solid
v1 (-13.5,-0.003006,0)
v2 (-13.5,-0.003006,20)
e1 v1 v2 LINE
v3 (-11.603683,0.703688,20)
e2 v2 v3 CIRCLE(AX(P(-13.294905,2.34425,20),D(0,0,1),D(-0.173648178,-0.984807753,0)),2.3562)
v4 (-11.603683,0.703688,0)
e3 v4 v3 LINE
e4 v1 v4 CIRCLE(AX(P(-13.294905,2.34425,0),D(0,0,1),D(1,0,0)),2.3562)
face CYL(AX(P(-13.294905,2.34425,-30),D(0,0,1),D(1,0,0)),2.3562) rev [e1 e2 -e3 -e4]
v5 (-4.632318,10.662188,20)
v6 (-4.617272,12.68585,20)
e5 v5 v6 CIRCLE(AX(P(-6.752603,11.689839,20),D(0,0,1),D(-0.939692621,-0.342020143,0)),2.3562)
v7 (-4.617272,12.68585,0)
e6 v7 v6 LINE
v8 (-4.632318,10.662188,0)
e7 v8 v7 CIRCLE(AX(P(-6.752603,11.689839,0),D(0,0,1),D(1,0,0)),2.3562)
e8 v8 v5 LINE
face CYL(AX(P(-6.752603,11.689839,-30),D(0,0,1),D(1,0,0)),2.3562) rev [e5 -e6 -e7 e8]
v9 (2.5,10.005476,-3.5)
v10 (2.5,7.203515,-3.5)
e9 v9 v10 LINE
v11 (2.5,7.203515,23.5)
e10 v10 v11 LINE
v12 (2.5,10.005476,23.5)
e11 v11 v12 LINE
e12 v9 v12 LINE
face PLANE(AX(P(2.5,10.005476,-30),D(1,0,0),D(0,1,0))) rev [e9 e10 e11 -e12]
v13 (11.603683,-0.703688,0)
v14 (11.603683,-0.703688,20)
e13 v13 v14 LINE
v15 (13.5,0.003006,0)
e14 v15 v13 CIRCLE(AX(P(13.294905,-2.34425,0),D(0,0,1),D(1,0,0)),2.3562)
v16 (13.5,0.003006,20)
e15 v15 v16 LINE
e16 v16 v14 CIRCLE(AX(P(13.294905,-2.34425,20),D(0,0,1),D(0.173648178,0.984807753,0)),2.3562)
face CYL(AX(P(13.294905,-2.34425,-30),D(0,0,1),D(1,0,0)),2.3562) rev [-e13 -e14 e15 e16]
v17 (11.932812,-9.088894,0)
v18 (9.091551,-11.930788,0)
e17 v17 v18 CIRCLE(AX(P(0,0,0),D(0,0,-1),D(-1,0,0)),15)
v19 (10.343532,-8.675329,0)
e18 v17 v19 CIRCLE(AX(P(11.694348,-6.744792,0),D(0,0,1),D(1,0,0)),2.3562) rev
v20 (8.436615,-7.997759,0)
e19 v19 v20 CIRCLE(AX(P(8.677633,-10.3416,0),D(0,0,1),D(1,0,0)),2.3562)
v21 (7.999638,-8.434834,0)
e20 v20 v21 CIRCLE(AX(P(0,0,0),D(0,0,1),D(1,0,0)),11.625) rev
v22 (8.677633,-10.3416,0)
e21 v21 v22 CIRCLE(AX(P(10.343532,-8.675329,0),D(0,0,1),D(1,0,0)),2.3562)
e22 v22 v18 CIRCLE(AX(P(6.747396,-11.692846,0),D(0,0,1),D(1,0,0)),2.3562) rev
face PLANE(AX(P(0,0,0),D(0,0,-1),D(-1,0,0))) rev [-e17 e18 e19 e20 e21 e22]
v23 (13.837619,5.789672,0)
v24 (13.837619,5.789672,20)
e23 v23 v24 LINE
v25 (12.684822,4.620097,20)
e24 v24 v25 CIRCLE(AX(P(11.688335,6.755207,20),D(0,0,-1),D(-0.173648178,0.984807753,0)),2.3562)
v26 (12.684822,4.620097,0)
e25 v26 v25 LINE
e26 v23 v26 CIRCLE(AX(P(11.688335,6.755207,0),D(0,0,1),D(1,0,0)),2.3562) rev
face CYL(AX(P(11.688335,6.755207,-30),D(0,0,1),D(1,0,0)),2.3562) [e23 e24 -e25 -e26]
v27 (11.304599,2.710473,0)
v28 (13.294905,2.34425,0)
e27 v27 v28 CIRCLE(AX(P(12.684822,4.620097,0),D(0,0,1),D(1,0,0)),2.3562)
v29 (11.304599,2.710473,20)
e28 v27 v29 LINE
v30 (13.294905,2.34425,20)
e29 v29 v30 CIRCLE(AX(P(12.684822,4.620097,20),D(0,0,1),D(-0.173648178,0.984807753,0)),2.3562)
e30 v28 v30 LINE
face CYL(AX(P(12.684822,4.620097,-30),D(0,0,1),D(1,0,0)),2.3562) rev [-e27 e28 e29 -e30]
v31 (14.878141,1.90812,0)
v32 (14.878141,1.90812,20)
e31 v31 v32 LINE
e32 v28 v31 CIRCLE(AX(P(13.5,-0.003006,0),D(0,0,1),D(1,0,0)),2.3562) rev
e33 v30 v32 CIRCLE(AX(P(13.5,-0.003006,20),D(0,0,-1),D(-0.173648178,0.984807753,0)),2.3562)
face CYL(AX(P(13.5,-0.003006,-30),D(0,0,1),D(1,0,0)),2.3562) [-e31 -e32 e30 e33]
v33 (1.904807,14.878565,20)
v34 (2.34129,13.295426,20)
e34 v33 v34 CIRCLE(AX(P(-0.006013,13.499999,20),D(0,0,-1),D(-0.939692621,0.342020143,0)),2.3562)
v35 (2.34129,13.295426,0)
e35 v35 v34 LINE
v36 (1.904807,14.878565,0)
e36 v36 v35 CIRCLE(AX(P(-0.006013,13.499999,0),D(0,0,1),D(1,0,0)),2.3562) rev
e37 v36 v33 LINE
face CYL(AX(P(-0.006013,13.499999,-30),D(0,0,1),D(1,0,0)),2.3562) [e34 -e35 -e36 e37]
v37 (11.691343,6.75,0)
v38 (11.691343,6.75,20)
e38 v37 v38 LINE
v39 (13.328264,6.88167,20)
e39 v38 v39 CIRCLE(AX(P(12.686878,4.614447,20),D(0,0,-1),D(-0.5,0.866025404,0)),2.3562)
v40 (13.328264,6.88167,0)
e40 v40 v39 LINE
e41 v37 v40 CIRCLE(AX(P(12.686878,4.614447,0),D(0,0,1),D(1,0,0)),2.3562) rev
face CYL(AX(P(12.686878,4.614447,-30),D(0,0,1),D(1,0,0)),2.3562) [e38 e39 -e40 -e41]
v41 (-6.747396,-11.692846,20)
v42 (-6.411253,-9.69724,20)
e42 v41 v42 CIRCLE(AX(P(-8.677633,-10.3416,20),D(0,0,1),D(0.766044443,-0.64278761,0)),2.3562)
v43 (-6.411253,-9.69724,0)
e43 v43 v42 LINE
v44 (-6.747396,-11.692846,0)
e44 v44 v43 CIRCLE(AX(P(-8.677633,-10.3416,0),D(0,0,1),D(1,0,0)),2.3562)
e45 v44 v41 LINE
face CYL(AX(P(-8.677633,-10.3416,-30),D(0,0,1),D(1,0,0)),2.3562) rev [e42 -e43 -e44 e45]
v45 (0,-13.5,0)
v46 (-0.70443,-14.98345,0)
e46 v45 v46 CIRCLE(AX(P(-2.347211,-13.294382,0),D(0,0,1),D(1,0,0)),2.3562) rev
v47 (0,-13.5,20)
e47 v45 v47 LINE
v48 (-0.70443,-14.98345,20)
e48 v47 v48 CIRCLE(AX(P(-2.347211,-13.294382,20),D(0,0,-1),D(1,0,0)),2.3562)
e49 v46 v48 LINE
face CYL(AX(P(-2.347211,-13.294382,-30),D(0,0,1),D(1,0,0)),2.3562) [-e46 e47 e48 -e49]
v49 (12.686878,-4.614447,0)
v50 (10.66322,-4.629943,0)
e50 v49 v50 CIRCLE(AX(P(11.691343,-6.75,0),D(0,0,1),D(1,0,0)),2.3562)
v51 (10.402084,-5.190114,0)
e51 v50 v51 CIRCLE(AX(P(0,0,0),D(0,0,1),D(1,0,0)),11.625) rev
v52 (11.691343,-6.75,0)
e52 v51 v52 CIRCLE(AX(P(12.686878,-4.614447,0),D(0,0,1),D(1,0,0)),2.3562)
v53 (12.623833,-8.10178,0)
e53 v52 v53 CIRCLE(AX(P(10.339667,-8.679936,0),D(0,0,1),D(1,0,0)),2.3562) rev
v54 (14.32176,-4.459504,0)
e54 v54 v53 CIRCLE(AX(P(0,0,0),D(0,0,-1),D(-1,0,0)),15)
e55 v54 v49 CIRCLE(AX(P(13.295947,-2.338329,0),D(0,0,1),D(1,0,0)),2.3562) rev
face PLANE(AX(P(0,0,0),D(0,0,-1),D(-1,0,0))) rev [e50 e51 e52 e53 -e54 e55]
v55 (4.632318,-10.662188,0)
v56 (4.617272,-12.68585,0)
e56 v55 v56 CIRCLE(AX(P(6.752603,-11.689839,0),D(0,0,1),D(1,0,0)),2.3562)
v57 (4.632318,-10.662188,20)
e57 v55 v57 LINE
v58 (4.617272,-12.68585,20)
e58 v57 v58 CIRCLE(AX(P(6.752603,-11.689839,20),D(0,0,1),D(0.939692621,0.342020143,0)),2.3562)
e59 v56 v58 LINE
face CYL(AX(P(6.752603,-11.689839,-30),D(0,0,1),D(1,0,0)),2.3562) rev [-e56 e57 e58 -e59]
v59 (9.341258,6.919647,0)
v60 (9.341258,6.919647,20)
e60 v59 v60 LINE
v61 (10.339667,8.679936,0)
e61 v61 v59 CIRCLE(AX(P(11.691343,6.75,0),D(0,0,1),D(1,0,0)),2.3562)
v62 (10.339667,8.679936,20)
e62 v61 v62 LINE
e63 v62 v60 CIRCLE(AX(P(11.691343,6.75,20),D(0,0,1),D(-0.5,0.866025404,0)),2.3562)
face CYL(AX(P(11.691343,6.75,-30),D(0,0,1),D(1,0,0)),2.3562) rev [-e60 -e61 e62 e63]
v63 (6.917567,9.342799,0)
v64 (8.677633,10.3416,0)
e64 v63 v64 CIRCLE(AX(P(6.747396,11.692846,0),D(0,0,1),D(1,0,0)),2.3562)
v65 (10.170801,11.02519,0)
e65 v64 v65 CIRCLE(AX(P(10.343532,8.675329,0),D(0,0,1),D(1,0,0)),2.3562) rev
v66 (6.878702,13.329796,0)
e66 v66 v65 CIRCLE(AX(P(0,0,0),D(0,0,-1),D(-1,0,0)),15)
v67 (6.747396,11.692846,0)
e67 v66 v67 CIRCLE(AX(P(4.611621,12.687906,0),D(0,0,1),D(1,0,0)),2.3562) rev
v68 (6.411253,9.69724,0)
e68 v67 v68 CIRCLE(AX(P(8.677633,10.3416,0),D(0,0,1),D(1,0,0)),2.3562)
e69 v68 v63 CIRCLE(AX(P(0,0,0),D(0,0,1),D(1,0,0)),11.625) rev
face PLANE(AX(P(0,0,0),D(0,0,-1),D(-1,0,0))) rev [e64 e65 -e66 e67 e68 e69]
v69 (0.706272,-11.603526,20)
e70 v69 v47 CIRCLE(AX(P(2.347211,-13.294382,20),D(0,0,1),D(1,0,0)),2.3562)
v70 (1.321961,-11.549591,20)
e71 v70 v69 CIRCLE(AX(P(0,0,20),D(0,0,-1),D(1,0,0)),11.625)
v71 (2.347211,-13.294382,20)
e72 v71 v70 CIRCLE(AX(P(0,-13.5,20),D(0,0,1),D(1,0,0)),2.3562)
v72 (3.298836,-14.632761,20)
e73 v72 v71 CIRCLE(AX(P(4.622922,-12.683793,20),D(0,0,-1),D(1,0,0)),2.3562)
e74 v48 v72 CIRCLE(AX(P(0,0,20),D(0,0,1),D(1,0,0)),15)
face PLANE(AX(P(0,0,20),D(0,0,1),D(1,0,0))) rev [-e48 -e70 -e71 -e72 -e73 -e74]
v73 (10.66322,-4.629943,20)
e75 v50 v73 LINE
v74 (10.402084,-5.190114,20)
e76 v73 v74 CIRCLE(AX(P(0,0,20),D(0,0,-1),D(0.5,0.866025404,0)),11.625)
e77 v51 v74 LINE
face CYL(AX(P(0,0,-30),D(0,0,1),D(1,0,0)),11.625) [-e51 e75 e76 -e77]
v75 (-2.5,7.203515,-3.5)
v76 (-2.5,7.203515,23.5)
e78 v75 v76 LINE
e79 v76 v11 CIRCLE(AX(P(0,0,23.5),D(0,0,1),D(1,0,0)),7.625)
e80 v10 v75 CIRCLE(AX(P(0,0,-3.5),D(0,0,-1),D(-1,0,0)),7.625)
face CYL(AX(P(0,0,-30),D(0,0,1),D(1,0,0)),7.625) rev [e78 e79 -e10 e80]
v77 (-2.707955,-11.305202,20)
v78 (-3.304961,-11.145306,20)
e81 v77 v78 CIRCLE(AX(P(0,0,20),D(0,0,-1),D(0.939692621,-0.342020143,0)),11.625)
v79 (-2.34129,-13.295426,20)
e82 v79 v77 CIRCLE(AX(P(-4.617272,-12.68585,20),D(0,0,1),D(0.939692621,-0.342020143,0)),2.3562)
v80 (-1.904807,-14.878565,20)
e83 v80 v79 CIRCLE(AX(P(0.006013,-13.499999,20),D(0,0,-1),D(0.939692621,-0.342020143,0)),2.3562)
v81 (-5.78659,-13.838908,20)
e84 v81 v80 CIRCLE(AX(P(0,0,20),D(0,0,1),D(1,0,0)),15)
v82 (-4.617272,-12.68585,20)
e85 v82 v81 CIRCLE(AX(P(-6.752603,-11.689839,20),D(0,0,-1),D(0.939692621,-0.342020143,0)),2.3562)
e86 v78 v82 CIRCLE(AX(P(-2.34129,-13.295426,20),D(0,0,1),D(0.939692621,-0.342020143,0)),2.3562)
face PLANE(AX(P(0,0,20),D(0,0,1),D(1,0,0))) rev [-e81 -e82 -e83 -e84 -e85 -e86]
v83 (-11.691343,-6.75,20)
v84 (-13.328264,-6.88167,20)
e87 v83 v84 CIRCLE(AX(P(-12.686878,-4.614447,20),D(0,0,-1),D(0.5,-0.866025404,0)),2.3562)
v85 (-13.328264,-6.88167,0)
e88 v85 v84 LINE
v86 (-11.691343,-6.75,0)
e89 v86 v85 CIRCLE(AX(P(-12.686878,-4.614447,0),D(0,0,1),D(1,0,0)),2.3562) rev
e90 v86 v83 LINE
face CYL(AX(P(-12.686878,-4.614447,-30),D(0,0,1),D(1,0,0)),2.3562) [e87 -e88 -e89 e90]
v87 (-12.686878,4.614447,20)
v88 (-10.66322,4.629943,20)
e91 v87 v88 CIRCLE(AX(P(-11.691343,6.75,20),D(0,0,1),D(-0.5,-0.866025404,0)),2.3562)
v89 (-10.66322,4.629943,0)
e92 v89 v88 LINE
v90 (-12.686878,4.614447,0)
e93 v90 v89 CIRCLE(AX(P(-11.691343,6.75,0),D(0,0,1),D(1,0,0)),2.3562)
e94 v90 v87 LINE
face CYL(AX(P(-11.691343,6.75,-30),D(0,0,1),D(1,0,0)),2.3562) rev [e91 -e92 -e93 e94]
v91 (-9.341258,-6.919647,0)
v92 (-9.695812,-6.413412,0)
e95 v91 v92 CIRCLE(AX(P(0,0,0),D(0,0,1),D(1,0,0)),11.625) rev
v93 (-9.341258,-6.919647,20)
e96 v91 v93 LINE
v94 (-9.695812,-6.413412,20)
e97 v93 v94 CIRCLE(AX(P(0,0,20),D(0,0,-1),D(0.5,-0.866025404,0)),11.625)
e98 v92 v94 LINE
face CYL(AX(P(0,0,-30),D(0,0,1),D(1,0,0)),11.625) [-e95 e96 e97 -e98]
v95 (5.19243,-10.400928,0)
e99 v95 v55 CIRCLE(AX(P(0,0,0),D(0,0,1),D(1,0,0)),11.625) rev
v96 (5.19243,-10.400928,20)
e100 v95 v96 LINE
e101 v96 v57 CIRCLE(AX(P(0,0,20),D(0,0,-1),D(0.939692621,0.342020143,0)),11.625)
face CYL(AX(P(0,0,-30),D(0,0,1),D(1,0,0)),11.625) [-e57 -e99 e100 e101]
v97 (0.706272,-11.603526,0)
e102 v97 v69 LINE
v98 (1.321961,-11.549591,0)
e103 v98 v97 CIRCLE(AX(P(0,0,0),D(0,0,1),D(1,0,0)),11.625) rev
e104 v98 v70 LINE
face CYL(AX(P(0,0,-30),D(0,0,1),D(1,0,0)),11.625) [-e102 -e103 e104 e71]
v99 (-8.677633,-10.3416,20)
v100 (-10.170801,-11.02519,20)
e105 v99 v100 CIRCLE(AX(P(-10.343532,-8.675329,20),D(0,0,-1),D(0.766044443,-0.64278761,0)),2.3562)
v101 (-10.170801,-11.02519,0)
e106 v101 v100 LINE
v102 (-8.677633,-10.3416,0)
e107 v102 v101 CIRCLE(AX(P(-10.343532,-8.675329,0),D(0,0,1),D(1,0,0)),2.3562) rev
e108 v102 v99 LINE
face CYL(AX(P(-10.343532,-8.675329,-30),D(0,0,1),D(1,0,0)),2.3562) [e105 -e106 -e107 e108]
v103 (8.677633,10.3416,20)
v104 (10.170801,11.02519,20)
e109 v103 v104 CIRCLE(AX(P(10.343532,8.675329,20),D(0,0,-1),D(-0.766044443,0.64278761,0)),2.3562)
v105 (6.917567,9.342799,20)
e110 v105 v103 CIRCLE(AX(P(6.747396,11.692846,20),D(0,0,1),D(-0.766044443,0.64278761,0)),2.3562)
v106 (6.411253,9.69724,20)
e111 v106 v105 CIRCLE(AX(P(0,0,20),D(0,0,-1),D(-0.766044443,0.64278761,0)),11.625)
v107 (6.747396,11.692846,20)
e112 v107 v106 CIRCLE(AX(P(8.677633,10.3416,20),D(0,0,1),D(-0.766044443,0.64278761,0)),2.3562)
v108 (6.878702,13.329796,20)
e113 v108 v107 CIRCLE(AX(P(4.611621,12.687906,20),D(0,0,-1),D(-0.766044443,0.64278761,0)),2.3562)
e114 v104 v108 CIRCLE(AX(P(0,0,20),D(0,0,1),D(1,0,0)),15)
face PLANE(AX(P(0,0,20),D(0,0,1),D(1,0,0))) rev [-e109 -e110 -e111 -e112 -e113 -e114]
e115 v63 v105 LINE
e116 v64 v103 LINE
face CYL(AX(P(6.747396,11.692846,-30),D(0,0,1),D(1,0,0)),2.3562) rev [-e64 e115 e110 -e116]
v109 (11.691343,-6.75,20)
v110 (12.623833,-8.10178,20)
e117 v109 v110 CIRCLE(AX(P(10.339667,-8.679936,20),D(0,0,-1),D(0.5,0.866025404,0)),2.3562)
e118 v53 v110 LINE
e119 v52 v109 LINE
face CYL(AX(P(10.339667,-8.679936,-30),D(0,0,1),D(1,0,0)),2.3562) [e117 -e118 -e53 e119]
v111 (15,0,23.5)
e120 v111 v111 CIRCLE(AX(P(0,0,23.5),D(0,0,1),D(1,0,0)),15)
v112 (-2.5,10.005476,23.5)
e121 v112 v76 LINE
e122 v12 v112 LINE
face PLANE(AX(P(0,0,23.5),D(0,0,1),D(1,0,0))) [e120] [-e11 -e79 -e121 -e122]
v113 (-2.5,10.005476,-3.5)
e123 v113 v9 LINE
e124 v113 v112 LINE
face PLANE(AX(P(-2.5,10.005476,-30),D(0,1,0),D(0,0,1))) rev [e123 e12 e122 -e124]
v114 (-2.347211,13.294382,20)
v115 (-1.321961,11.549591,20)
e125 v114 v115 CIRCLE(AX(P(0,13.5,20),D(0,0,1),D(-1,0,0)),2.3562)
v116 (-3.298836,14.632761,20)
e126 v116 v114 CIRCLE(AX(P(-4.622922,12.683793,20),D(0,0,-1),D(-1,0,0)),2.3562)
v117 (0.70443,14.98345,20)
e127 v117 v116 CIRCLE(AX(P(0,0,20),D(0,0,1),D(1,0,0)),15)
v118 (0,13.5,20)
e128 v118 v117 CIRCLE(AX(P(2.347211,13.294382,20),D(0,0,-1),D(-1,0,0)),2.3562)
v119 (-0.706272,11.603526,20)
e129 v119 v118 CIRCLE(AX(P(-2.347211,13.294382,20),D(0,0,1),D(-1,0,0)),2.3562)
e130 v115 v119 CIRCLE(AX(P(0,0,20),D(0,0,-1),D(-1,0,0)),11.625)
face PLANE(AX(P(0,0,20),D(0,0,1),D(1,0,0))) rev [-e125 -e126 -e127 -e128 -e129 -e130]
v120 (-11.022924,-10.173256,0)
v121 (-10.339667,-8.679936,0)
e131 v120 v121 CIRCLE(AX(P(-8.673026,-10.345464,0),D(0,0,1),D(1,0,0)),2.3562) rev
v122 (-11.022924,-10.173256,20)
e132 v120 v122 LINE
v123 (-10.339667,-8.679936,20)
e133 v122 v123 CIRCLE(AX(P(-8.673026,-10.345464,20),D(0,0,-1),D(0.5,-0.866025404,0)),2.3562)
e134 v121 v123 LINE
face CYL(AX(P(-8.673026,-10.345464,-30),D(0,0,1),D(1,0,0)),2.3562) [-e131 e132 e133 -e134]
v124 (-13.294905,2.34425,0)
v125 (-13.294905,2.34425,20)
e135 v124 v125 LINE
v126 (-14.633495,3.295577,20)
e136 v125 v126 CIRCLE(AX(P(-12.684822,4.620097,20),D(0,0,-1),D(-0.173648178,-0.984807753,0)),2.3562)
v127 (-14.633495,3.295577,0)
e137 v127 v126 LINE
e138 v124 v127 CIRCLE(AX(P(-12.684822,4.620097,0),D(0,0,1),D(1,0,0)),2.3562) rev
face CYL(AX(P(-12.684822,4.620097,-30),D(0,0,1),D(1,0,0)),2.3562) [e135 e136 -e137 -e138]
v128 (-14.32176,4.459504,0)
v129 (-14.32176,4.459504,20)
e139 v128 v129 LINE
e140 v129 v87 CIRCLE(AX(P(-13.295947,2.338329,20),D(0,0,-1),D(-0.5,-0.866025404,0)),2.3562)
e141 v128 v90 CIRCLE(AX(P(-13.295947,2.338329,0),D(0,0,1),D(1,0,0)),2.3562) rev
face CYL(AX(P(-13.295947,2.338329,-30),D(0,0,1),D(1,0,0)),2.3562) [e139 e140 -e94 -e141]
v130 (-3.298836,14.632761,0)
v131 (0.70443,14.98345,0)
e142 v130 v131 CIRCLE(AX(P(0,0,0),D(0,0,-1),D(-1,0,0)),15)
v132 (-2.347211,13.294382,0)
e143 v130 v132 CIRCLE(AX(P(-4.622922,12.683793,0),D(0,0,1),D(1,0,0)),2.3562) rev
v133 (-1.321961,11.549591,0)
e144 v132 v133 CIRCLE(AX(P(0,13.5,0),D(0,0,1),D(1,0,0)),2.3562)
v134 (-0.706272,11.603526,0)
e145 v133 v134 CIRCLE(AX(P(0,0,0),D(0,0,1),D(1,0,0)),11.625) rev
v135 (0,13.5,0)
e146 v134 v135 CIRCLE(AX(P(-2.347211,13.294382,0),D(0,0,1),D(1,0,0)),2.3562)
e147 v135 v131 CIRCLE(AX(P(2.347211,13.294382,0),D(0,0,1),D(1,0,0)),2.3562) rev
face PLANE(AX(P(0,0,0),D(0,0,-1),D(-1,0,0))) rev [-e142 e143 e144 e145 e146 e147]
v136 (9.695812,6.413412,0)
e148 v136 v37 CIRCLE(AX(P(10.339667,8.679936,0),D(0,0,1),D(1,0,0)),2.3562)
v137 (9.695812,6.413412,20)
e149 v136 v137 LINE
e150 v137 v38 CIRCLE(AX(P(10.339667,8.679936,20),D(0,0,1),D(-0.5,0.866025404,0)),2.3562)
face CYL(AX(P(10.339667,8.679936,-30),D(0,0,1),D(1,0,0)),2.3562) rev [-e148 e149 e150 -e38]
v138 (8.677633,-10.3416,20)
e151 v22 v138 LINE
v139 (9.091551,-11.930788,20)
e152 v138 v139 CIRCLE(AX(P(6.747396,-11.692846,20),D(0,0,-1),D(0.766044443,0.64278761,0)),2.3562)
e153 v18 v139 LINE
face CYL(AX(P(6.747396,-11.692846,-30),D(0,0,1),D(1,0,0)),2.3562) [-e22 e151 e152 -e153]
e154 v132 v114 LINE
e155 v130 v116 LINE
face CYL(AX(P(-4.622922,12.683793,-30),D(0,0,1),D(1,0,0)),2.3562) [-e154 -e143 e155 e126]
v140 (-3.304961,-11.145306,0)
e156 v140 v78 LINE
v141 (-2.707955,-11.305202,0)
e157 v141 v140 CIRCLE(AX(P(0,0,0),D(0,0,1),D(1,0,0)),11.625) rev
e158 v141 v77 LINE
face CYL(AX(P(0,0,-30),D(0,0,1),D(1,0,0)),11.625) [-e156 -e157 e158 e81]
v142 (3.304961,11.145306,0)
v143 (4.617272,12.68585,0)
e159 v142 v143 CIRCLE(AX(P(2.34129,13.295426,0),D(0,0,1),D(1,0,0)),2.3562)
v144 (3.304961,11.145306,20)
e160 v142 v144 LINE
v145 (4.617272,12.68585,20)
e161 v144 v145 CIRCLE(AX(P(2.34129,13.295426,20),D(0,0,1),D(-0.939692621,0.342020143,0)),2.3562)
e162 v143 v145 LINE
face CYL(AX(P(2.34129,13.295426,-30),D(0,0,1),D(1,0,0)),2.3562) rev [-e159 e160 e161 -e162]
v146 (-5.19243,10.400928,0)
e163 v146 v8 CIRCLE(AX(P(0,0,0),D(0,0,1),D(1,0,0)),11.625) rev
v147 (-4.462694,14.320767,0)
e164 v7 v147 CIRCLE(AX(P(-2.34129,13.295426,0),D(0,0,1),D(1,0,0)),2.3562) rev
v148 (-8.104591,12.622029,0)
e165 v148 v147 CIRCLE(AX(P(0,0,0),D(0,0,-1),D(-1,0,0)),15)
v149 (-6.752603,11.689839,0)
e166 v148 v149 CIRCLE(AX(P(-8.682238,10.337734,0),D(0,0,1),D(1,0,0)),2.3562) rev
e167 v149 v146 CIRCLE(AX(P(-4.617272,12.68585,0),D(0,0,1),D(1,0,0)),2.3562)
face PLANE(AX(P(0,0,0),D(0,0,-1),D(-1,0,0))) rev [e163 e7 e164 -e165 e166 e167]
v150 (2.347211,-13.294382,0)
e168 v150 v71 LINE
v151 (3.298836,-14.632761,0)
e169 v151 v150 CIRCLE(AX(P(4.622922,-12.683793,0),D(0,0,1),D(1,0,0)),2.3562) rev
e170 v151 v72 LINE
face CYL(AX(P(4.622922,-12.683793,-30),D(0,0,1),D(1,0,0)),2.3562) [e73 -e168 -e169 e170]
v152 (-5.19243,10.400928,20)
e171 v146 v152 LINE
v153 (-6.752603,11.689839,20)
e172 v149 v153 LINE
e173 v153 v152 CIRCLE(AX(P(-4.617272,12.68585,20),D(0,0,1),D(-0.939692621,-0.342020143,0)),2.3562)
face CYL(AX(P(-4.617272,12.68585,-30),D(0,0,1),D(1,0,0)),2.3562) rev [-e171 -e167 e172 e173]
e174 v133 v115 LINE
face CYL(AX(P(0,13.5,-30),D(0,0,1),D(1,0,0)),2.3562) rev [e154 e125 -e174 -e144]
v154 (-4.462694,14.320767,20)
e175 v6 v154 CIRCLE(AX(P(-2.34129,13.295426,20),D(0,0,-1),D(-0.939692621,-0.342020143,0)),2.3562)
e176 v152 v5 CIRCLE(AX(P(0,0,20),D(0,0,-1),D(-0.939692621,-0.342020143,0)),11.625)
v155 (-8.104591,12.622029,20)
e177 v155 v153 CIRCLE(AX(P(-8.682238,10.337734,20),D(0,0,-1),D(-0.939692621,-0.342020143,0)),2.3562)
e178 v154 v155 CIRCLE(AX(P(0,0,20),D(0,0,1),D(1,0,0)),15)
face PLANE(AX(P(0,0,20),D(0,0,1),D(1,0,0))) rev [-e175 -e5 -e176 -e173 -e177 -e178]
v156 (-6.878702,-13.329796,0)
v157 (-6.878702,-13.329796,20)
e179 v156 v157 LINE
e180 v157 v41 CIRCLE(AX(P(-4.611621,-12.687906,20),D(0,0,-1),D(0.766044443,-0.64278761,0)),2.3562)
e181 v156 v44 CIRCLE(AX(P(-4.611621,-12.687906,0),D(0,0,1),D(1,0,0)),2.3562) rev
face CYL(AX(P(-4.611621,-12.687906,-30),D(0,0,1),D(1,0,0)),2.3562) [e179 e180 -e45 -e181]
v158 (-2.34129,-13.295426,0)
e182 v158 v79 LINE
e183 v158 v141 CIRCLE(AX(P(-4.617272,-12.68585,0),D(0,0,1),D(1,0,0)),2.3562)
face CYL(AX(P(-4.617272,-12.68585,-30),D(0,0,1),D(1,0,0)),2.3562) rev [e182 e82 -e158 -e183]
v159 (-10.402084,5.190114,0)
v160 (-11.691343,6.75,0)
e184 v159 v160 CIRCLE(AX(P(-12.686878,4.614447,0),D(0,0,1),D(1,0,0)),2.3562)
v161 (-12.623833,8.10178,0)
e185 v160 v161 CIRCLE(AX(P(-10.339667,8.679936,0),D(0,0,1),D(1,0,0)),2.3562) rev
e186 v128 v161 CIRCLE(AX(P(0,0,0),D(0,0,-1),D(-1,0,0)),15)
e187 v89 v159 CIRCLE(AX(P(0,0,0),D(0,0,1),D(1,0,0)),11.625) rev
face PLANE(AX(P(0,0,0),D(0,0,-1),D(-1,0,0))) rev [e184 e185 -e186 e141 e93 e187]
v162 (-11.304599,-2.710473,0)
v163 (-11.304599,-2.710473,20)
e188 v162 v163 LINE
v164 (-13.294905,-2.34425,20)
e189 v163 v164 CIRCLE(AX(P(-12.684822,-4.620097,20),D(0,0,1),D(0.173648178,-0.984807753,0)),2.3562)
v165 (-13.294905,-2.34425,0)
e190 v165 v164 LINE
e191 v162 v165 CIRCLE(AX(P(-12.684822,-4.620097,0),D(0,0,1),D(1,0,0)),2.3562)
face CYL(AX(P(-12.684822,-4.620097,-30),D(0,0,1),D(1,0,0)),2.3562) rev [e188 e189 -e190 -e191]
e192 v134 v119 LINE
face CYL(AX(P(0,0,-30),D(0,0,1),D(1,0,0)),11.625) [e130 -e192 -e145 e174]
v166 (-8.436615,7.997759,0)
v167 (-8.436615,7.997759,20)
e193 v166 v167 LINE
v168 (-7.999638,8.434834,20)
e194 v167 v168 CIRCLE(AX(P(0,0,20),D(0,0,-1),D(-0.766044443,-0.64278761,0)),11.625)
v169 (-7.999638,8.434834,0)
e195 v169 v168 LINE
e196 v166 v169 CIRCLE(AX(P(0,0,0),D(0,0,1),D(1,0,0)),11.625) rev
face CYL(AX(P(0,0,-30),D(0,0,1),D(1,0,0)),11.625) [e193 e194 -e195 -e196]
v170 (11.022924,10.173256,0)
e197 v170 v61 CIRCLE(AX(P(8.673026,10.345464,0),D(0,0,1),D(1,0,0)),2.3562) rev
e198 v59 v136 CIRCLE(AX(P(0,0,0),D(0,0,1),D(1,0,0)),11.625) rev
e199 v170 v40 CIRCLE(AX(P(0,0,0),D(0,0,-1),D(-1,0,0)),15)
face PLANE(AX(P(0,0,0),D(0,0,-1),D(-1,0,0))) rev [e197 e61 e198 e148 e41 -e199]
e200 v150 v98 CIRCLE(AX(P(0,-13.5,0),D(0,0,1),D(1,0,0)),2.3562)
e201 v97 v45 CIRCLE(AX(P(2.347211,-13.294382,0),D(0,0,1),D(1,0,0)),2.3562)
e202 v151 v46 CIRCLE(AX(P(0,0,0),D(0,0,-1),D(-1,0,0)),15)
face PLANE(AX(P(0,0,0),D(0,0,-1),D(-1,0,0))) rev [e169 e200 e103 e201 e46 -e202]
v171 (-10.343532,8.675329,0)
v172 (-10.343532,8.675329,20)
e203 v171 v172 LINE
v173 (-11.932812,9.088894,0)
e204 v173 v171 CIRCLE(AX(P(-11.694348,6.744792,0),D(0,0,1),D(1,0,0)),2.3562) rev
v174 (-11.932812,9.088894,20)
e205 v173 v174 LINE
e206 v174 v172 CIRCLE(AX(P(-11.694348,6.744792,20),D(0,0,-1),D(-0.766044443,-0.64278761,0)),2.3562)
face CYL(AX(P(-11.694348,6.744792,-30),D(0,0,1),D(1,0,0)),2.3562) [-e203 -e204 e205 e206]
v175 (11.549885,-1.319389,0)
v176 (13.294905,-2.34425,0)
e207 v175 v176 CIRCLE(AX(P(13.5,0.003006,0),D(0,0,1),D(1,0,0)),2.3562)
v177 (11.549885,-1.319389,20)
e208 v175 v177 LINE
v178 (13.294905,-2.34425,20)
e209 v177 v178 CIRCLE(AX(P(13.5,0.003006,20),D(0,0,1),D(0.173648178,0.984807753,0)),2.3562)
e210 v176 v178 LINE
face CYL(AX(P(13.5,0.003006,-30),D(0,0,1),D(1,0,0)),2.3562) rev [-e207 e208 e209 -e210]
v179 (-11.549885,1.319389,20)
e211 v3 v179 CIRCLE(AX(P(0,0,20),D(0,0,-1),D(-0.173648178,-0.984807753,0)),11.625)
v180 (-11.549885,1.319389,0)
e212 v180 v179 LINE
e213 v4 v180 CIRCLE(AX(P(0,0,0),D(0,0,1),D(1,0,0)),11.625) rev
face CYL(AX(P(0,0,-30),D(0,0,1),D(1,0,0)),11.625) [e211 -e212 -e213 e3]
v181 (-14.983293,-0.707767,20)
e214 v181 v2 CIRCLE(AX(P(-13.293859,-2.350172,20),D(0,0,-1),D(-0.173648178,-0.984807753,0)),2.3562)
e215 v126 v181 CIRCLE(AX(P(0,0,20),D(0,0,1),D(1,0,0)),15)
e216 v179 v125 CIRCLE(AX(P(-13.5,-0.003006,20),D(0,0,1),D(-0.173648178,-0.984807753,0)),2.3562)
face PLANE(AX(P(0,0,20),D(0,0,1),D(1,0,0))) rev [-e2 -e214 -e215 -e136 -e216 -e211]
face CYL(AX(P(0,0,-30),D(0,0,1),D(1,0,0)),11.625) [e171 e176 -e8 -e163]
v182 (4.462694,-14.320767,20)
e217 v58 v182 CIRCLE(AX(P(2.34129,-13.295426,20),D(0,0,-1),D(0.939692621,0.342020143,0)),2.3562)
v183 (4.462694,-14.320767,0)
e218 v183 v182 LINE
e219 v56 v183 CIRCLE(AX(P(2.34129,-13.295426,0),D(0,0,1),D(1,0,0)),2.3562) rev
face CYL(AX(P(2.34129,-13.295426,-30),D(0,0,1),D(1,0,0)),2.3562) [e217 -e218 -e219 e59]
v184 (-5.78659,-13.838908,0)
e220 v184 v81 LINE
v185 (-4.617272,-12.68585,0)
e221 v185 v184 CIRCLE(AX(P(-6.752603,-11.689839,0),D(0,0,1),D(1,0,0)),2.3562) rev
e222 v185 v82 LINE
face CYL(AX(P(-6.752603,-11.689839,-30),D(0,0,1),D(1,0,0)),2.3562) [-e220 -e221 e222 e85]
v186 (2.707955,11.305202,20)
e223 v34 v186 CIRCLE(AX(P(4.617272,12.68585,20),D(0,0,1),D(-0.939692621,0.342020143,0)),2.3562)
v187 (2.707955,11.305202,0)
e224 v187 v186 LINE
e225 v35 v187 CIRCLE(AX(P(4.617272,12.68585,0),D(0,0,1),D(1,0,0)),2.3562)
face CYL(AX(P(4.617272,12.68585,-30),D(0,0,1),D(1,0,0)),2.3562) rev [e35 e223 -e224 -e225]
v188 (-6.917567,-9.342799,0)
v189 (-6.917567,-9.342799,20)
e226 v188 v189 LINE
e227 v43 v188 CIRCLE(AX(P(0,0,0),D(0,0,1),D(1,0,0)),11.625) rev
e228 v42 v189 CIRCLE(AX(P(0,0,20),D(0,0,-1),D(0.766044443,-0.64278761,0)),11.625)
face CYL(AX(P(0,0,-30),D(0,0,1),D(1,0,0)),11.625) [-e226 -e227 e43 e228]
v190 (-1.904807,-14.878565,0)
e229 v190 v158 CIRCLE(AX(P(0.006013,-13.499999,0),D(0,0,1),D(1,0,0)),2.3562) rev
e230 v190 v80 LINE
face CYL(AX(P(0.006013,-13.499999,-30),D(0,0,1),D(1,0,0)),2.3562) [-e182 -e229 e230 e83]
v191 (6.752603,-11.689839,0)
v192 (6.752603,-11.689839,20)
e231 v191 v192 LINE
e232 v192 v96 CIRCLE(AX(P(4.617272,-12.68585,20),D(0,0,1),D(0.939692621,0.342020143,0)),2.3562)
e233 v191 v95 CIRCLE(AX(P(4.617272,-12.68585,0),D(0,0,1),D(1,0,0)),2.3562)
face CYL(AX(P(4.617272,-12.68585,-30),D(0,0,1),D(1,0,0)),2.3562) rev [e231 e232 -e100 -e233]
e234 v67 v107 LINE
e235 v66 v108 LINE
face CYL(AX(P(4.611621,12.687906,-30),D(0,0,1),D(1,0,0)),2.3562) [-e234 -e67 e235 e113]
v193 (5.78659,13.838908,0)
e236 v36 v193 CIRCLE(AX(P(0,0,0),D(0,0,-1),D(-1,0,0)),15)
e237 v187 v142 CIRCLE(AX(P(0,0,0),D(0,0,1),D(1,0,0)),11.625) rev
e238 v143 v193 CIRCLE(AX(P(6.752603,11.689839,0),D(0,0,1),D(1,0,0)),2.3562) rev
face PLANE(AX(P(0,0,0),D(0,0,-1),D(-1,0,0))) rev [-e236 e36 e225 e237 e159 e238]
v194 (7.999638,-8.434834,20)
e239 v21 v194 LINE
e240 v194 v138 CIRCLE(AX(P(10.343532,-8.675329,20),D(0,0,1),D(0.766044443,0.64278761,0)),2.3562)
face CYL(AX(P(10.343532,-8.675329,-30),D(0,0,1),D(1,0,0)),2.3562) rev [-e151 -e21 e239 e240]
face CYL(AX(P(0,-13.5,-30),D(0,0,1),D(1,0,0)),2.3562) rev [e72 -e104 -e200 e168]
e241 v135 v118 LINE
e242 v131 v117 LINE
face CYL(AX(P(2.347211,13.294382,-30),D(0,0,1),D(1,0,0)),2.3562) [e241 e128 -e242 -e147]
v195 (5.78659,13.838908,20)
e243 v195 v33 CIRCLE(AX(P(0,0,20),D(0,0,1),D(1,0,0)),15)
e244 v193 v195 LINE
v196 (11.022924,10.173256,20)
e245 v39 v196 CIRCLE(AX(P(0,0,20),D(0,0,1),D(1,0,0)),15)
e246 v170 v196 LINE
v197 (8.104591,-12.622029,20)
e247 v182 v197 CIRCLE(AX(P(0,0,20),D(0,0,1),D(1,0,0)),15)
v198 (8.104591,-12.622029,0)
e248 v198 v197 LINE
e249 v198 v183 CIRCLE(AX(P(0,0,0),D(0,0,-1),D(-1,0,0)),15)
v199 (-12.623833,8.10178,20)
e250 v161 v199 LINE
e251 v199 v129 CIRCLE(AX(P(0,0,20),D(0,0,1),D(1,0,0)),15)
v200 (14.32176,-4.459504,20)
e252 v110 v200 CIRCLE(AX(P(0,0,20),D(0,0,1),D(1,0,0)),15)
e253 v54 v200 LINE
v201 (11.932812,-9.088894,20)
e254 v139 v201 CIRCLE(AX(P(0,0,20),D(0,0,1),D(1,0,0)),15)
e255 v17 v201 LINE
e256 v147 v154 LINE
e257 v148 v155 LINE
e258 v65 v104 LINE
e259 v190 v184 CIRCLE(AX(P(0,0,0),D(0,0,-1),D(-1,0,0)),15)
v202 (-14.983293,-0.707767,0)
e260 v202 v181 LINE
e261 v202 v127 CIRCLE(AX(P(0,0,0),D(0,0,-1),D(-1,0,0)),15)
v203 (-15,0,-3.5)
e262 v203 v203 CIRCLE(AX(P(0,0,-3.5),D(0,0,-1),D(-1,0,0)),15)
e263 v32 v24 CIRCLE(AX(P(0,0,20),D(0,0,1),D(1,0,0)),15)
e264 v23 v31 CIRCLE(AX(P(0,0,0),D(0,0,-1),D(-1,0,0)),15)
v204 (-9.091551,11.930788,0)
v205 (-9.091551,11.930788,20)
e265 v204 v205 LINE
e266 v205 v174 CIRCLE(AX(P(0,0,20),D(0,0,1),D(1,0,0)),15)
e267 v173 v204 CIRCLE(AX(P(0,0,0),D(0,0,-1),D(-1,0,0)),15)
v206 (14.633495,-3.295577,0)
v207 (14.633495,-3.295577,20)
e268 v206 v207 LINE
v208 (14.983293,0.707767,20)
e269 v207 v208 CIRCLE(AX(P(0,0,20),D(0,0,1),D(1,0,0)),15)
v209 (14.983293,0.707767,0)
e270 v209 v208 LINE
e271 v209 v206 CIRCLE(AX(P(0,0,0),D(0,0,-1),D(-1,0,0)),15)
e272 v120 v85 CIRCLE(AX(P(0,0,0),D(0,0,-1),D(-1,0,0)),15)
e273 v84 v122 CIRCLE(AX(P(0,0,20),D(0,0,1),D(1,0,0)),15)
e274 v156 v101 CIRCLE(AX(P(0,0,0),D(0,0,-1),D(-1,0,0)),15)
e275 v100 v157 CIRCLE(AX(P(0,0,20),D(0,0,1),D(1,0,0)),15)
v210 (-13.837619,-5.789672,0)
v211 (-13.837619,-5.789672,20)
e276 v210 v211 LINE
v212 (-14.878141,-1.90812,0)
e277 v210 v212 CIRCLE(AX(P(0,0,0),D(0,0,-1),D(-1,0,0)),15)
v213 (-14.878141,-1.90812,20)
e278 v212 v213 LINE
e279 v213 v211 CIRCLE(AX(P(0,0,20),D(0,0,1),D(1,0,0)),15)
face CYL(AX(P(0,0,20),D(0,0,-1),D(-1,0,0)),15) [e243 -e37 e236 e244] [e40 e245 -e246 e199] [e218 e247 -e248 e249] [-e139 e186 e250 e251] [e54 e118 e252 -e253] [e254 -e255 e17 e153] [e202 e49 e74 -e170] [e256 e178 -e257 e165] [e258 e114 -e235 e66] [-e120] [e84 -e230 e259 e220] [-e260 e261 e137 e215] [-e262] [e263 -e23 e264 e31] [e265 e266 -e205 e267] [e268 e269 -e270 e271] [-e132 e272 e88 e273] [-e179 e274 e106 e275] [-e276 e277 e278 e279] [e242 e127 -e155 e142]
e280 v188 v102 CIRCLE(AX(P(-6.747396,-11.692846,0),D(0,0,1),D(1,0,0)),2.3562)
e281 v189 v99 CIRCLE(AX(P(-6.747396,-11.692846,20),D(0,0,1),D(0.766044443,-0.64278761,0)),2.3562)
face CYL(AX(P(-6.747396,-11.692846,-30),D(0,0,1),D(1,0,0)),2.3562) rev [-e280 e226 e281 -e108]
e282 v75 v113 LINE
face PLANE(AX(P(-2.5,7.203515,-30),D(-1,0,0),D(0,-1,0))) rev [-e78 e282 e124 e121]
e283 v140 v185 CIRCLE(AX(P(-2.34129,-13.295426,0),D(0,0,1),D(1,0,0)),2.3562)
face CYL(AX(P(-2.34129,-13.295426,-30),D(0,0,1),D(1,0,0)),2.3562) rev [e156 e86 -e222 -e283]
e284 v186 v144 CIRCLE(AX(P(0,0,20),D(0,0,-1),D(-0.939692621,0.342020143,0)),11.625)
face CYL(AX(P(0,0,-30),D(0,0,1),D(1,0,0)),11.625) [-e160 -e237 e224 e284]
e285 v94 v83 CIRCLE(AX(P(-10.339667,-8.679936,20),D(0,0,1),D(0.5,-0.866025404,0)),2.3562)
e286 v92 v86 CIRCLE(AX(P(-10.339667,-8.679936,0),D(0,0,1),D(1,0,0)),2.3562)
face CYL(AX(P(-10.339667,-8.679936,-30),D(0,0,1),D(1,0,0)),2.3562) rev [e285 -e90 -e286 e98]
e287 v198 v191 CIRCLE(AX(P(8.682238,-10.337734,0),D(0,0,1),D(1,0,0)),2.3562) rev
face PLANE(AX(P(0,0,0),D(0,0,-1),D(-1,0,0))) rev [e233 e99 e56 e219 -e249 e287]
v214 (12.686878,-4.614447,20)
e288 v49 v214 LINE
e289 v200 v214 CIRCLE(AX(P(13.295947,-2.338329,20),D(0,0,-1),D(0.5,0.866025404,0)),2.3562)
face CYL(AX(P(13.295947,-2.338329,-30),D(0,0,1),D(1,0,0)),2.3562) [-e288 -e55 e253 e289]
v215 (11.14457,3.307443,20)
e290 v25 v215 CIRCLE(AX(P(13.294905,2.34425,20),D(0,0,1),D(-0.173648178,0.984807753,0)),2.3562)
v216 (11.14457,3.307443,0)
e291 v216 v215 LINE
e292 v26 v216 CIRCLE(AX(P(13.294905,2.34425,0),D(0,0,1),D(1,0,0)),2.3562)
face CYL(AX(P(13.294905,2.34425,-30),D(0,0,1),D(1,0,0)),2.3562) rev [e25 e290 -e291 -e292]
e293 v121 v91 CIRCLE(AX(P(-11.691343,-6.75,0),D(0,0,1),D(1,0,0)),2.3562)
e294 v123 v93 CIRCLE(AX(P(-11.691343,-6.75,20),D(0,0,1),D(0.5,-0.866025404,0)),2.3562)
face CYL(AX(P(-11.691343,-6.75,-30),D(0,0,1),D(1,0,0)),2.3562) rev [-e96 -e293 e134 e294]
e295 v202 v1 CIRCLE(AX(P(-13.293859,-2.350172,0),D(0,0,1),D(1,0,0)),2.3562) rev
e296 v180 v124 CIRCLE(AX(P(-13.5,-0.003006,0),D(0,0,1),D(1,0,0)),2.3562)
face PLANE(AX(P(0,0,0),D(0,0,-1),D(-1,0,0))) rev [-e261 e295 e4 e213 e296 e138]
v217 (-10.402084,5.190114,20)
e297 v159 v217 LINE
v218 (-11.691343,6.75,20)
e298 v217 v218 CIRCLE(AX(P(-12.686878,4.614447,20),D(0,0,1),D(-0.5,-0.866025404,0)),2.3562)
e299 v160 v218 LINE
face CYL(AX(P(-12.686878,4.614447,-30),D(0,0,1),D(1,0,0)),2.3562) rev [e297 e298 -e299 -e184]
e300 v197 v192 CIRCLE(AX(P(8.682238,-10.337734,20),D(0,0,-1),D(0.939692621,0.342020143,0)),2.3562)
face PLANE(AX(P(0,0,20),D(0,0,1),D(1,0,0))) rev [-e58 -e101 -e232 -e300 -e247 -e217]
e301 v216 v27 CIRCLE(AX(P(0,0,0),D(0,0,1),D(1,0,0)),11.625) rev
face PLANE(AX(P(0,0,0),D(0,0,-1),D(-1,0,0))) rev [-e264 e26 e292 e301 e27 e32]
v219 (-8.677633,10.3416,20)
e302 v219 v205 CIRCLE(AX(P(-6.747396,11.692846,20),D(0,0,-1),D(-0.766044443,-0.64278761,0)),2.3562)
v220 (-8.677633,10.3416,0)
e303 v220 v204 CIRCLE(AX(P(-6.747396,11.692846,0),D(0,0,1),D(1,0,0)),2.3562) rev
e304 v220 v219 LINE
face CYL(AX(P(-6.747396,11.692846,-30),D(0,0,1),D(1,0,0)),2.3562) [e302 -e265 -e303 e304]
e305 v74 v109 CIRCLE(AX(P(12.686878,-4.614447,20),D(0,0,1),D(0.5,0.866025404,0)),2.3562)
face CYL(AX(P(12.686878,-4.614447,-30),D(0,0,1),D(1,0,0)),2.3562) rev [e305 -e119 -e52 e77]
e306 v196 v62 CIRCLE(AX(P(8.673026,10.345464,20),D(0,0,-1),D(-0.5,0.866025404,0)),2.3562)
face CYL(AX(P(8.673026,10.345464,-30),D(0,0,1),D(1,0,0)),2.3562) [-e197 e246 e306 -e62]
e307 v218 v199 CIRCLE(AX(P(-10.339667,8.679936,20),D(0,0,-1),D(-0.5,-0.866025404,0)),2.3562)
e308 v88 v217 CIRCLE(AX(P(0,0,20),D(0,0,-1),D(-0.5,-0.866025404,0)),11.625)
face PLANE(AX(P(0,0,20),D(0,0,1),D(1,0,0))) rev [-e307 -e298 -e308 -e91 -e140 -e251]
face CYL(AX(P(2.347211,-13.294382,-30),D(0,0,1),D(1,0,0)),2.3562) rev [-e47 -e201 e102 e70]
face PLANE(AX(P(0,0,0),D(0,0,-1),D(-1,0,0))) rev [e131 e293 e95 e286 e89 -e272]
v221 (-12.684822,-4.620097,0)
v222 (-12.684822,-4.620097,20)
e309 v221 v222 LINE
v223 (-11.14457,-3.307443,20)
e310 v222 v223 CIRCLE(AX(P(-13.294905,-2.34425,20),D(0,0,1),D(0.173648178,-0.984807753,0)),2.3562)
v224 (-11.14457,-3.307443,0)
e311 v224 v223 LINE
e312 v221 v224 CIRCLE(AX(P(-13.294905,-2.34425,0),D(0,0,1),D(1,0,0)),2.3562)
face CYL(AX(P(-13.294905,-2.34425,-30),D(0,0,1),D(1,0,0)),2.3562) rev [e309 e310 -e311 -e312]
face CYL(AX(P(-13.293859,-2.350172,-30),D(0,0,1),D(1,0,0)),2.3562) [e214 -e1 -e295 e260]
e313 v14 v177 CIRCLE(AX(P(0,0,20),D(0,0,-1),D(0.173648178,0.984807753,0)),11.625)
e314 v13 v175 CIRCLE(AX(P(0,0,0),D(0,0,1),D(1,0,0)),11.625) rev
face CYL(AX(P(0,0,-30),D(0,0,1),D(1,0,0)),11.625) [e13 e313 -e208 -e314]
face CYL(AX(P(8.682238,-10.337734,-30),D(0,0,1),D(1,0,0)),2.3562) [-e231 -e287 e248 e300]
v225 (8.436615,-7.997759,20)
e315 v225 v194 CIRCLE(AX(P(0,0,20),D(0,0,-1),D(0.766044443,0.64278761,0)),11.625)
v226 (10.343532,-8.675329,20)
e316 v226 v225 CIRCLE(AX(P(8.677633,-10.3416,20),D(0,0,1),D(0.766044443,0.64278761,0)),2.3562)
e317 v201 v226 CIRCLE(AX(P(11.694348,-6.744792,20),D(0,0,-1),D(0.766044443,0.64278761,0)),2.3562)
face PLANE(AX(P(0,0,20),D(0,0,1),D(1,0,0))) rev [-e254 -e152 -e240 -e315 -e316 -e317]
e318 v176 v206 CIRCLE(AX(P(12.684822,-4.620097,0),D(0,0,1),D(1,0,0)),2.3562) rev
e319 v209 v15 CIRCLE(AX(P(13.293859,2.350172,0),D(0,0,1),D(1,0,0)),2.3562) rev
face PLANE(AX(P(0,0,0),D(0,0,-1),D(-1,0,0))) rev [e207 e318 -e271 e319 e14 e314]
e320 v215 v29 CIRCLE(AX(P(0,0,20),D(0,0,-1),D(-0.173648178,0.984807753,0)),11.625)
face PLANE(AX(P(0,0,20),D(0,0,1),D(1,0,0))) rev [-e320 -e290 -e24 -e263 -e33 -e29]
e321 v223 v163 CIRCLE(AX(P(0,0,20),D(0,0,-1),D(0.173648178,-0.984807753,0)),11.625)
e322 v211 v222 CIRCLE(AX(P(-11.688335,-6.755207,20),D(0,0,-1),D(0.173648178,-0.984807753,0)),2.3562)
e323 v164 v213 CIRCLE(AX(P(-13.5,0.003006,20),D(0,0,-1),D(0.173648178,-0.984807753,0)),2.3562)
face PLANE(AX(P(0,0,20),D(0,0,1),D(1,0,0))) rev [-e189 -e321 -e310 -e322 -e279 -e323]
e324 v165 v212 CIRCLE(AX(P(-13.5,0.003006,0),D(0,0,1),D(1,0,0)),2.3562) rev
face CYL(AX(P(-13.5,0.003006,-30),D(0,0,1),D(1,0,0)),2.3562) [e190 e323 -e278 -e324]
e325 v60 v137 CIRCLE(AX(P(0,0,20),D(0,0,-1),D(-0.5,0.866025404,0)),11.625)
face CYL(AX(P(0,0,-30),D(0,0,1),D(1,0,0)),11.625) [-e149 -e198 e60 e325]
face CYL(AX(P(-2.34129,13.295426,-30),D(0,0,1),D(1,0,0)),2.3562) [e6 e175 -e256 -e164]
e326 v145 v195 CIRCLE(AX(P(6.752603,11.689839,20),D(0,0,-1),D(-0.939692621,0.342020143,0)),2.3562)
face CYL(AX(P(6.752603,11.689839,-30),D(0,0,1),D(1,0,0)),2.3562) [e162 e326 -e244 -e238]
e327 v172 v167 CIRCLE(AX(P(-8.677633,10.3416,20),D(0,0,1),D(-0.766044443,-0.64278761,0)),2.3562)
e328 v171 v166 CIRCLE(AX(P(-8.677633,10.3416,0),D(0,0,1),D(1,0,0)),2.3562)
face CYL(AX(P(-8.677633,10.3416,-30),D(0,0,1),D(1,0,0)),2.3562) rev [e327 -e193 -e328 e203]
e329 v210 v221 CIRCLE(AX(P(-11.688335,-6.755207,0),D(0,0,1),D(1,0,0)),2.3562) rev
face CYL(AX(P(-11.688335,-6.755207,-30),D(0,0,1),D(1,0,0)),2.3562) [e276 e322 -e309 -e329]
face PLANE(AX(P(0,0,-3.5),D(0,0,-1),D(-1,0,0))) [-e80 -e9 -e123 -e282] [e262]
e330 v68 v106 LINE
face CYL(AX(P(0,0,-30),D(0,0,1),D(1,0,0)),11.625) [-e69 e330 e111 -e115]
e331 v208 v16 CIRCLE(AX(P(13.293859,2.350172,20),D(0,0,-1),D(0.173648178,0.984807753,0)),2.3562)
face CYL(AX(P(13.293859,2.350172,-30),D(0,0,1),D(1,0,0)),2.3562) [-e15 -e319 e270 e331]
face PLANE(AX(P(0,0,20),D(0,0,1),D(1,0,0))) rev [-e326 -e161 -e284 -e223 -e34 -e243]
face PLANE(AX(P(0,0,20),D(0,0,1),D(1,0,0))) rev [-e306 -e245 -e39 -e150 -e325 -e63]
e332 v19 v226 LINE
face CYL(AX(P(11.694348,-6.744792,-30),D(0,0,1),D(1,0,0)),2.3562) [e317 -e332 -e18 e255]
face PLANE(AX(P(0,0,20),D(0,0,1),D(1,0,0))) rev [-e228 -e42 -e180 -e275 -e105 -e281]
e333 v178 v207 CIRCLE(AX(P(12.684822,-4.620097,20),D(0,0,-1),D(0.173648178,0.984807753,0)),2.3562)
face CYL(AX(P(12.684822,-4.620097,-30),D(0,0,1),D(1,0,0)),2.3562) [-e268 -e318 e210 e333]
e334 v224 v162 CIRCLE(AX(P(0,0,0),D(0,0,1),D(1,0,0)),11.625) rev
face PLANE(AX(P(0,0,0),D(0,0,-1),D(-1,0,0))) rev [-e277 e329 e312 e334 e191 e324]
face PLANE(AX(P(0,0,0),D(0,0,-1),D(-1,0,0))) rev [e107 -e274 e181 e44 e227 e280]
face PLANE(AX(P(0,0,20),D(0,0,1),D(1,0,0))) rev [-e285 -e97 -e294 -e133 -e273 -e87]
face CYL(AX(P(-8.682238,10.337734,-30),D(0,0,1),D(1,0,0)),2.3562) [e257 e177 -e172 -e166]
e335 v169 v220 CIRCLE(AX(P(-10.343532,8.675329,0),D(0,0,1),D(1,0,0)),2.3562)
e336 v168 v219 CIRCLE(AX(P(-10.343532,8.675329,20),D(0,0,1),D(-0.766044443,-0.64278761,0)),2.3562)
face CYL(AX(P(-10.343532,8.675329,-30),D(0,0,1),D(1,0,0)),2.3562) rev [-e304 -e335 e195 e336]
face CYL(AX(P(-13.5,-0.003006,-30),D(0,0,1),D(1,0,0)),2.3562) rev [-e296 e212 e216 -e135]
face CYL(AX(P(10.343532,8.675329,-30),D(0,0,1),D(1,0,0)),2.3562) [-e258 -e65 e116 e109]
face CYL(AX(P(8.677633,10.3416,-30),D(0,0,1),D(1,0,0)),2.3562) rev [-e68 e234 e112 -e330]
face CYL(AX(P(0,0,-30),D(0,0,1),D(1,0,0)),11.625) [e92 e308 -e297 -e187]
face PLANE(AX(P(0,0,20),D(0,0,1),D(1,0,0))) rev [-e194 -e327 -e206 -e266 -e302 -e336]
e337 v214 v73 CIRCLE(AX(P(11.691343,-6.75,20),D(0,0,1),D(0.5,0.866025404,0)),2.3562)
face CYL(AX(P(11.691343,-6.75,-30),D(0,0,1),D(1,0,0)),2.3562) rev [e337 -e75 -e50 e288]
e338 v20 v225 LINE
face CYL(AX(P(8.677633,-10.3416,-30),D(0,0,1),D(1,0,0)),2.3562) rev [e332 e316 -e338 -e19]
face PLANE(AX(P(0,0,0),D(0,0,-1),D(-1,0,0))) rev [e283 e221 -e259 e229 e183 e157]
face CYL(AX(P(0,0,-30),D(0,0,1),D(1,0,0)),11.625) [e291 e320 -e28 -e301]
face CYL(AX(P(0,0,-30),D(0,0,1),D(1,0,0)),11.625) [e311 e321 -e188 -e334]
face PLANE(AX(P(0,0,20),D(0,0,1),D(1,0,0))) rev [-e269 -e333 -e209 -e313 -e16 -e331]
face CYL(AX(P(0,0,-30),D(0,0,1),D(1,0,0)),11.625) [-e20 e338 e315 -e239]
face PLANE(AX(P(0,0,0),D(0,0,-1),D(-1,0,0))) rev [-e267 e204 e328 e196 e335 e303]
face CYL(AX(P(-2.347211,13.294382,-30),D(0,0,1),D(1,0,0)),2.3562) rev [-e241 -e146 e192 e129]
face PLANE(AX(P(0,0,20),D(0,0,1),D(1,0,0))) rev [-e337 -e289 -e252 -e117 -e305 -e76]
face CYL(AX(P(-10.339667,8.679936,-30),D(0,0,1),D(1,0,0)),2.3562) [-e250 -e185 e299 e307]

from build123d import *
from build123d.topology import SkipClean

# Parameters (mm, degrees)
CROQUIS1_R              = 15
SALIENTE_EXTRUIR1_DEPTH = 20
CORTAR_EXTRUIR1_START   = -50
CORTAR_EXTRUIR1_DEPTH   = 50
MATRIZC1_COUNT          = 18
CORTAR_EXTRUIR2_DEPTH   = 50
SALIENTE_EXTRUIR2_START = 3.5
CROQUIS4_R              = 15
SALIENTE_EXTRUIR2_DEPTH = 3.5
CROQUIS5_R              = 15
SALIENTE_EXTRUIR3_DEPTH = 3.5


with BuildPart() as part:
    # Croquis1 → Saliente-Extruir1 (new body)
    with BuildSketch(Plane.XY):
        Circle(CROQUIS1_R)
    extrude(amount=SALIENTE_EXTRUIR1_DEPTH)

    # Croquis2 → Cortar-Extruir1 (cut)
    with BuildSketch(Plane.XY.offset(20).offset(CORTAR_EXTRUIR1_START)):
        with BuildLine():
            ThreePointArc((0.706271711, -11.603525553), (0.13915994, -12.472075367), (0, -13.5))
            ThreePointArc((0, -13.5), (-0.21879275, -14.305081992), (-0.704430424, -14.983450129))
            ThreePointArc((-0.704430424, -14.983450129), (1.309, -14.942774809), (3.298836097, -14.632760519))
            ThreePointArc((3.298836097, -14.632760519), (2.702648979, -14.049161169), (2.347211067, -13.29438228))
            ThreePointArc((2.347211067, -13.29438228), (2.031447992, -12.306309297), (1.321961295, -11.549590613))
            ThreePointArc((1.321961295, -11.549590613), (1.014475, -11.580650477), (0.706271711, -11.603525553))
        make_face()
    cortar_extruir1 = extrude(amount=CORTAR_EXTRUIR1_DEPTH, mode=Mode.SUBTRACT)

    # MatrizC1: Cortar-Extruir1 ×18 about axis
    matrizc1_axis = Axis((0, 0, 20), (0, 0, 1))
    for i in range(1, MATRIZC1_COUNT):
        add(cortar_extruir1.rotate(matrizc1_axis, i * 360 / MATRIZC1_COUNT), mode=Mode.SUBTRACT)

    # Croquis3 → Cortar-Extruir2 (cut)
    with BuildSketch(Plane.XY.offset(20)):
        with BuildLine():
            Line((-2.5, 7.203514767), (-2.5, 10.005475737))
            Line((-2.5, 10.005475737), (2.5, 10.005475737))
            Line((2.5, 10.005475737), (2.5, 7.203514767))
            ThreePointArc((2.5, 7.203514767), (0, -7.625), (-2.5, 7.203514767))
        make_face()
    extrude(amount=-CORTAR_EXTRUIR2_DEPTH, mode=Mode.SUBTRACT)

    # Croquis4 → Saliente-Extruir2 (add)
    with SkipClean():  # the faces are left unmerged after this step: merging them gives an invalid solid
        with BuildSketch(Plane(origin=(0, 0, 0), x_dir=(-1, 0, 0), z_dir=(0, 0, -1)).offset(SALIENTE_EXTRUIR2_START)):
            Circle(CROQUIS4_R)
            with BuildLine():
                Line((2.5, 10.005475737), (2.5, 7.203514767))
                ThreePointArc((2.5, 7.203514767), (0, -7.625), (-2.5, 7.203514767))
                Line((-2.5, 7.203514767), (-2.5, 10.005475737))
                Line((-2.5, 10.005475737), (2.5, 10.005475737))
            make_face(mode=Mode.SUBTRACT)
        extrude(amount=-SALIENTE_EXTRUIR2_DEPTH)

    # Croquis5 → Saliente-Extruir3 (add)
    with BuildSketch(Plane.XY.offset(20)):
        Circle(CROQUIS5_R)
        with BuildLine():
            Line((2.5, 10.005475737), (2.5, 7.203514767))
            ThreePointArc((2.5, 7.203514767), (0, -7.625), (-2.5, 7.203514767))
            Line((-2.5, 7.203514767), (-2.5, 10.005475737))
            Line((-2.5, 10.005475737), (2.5, 10.005475737))
        make_face(mode=Mode.SUBTRACT)
    extrude(amount=SALIENTE_EXTRUIR3_DEPTH)


solid = part.part
